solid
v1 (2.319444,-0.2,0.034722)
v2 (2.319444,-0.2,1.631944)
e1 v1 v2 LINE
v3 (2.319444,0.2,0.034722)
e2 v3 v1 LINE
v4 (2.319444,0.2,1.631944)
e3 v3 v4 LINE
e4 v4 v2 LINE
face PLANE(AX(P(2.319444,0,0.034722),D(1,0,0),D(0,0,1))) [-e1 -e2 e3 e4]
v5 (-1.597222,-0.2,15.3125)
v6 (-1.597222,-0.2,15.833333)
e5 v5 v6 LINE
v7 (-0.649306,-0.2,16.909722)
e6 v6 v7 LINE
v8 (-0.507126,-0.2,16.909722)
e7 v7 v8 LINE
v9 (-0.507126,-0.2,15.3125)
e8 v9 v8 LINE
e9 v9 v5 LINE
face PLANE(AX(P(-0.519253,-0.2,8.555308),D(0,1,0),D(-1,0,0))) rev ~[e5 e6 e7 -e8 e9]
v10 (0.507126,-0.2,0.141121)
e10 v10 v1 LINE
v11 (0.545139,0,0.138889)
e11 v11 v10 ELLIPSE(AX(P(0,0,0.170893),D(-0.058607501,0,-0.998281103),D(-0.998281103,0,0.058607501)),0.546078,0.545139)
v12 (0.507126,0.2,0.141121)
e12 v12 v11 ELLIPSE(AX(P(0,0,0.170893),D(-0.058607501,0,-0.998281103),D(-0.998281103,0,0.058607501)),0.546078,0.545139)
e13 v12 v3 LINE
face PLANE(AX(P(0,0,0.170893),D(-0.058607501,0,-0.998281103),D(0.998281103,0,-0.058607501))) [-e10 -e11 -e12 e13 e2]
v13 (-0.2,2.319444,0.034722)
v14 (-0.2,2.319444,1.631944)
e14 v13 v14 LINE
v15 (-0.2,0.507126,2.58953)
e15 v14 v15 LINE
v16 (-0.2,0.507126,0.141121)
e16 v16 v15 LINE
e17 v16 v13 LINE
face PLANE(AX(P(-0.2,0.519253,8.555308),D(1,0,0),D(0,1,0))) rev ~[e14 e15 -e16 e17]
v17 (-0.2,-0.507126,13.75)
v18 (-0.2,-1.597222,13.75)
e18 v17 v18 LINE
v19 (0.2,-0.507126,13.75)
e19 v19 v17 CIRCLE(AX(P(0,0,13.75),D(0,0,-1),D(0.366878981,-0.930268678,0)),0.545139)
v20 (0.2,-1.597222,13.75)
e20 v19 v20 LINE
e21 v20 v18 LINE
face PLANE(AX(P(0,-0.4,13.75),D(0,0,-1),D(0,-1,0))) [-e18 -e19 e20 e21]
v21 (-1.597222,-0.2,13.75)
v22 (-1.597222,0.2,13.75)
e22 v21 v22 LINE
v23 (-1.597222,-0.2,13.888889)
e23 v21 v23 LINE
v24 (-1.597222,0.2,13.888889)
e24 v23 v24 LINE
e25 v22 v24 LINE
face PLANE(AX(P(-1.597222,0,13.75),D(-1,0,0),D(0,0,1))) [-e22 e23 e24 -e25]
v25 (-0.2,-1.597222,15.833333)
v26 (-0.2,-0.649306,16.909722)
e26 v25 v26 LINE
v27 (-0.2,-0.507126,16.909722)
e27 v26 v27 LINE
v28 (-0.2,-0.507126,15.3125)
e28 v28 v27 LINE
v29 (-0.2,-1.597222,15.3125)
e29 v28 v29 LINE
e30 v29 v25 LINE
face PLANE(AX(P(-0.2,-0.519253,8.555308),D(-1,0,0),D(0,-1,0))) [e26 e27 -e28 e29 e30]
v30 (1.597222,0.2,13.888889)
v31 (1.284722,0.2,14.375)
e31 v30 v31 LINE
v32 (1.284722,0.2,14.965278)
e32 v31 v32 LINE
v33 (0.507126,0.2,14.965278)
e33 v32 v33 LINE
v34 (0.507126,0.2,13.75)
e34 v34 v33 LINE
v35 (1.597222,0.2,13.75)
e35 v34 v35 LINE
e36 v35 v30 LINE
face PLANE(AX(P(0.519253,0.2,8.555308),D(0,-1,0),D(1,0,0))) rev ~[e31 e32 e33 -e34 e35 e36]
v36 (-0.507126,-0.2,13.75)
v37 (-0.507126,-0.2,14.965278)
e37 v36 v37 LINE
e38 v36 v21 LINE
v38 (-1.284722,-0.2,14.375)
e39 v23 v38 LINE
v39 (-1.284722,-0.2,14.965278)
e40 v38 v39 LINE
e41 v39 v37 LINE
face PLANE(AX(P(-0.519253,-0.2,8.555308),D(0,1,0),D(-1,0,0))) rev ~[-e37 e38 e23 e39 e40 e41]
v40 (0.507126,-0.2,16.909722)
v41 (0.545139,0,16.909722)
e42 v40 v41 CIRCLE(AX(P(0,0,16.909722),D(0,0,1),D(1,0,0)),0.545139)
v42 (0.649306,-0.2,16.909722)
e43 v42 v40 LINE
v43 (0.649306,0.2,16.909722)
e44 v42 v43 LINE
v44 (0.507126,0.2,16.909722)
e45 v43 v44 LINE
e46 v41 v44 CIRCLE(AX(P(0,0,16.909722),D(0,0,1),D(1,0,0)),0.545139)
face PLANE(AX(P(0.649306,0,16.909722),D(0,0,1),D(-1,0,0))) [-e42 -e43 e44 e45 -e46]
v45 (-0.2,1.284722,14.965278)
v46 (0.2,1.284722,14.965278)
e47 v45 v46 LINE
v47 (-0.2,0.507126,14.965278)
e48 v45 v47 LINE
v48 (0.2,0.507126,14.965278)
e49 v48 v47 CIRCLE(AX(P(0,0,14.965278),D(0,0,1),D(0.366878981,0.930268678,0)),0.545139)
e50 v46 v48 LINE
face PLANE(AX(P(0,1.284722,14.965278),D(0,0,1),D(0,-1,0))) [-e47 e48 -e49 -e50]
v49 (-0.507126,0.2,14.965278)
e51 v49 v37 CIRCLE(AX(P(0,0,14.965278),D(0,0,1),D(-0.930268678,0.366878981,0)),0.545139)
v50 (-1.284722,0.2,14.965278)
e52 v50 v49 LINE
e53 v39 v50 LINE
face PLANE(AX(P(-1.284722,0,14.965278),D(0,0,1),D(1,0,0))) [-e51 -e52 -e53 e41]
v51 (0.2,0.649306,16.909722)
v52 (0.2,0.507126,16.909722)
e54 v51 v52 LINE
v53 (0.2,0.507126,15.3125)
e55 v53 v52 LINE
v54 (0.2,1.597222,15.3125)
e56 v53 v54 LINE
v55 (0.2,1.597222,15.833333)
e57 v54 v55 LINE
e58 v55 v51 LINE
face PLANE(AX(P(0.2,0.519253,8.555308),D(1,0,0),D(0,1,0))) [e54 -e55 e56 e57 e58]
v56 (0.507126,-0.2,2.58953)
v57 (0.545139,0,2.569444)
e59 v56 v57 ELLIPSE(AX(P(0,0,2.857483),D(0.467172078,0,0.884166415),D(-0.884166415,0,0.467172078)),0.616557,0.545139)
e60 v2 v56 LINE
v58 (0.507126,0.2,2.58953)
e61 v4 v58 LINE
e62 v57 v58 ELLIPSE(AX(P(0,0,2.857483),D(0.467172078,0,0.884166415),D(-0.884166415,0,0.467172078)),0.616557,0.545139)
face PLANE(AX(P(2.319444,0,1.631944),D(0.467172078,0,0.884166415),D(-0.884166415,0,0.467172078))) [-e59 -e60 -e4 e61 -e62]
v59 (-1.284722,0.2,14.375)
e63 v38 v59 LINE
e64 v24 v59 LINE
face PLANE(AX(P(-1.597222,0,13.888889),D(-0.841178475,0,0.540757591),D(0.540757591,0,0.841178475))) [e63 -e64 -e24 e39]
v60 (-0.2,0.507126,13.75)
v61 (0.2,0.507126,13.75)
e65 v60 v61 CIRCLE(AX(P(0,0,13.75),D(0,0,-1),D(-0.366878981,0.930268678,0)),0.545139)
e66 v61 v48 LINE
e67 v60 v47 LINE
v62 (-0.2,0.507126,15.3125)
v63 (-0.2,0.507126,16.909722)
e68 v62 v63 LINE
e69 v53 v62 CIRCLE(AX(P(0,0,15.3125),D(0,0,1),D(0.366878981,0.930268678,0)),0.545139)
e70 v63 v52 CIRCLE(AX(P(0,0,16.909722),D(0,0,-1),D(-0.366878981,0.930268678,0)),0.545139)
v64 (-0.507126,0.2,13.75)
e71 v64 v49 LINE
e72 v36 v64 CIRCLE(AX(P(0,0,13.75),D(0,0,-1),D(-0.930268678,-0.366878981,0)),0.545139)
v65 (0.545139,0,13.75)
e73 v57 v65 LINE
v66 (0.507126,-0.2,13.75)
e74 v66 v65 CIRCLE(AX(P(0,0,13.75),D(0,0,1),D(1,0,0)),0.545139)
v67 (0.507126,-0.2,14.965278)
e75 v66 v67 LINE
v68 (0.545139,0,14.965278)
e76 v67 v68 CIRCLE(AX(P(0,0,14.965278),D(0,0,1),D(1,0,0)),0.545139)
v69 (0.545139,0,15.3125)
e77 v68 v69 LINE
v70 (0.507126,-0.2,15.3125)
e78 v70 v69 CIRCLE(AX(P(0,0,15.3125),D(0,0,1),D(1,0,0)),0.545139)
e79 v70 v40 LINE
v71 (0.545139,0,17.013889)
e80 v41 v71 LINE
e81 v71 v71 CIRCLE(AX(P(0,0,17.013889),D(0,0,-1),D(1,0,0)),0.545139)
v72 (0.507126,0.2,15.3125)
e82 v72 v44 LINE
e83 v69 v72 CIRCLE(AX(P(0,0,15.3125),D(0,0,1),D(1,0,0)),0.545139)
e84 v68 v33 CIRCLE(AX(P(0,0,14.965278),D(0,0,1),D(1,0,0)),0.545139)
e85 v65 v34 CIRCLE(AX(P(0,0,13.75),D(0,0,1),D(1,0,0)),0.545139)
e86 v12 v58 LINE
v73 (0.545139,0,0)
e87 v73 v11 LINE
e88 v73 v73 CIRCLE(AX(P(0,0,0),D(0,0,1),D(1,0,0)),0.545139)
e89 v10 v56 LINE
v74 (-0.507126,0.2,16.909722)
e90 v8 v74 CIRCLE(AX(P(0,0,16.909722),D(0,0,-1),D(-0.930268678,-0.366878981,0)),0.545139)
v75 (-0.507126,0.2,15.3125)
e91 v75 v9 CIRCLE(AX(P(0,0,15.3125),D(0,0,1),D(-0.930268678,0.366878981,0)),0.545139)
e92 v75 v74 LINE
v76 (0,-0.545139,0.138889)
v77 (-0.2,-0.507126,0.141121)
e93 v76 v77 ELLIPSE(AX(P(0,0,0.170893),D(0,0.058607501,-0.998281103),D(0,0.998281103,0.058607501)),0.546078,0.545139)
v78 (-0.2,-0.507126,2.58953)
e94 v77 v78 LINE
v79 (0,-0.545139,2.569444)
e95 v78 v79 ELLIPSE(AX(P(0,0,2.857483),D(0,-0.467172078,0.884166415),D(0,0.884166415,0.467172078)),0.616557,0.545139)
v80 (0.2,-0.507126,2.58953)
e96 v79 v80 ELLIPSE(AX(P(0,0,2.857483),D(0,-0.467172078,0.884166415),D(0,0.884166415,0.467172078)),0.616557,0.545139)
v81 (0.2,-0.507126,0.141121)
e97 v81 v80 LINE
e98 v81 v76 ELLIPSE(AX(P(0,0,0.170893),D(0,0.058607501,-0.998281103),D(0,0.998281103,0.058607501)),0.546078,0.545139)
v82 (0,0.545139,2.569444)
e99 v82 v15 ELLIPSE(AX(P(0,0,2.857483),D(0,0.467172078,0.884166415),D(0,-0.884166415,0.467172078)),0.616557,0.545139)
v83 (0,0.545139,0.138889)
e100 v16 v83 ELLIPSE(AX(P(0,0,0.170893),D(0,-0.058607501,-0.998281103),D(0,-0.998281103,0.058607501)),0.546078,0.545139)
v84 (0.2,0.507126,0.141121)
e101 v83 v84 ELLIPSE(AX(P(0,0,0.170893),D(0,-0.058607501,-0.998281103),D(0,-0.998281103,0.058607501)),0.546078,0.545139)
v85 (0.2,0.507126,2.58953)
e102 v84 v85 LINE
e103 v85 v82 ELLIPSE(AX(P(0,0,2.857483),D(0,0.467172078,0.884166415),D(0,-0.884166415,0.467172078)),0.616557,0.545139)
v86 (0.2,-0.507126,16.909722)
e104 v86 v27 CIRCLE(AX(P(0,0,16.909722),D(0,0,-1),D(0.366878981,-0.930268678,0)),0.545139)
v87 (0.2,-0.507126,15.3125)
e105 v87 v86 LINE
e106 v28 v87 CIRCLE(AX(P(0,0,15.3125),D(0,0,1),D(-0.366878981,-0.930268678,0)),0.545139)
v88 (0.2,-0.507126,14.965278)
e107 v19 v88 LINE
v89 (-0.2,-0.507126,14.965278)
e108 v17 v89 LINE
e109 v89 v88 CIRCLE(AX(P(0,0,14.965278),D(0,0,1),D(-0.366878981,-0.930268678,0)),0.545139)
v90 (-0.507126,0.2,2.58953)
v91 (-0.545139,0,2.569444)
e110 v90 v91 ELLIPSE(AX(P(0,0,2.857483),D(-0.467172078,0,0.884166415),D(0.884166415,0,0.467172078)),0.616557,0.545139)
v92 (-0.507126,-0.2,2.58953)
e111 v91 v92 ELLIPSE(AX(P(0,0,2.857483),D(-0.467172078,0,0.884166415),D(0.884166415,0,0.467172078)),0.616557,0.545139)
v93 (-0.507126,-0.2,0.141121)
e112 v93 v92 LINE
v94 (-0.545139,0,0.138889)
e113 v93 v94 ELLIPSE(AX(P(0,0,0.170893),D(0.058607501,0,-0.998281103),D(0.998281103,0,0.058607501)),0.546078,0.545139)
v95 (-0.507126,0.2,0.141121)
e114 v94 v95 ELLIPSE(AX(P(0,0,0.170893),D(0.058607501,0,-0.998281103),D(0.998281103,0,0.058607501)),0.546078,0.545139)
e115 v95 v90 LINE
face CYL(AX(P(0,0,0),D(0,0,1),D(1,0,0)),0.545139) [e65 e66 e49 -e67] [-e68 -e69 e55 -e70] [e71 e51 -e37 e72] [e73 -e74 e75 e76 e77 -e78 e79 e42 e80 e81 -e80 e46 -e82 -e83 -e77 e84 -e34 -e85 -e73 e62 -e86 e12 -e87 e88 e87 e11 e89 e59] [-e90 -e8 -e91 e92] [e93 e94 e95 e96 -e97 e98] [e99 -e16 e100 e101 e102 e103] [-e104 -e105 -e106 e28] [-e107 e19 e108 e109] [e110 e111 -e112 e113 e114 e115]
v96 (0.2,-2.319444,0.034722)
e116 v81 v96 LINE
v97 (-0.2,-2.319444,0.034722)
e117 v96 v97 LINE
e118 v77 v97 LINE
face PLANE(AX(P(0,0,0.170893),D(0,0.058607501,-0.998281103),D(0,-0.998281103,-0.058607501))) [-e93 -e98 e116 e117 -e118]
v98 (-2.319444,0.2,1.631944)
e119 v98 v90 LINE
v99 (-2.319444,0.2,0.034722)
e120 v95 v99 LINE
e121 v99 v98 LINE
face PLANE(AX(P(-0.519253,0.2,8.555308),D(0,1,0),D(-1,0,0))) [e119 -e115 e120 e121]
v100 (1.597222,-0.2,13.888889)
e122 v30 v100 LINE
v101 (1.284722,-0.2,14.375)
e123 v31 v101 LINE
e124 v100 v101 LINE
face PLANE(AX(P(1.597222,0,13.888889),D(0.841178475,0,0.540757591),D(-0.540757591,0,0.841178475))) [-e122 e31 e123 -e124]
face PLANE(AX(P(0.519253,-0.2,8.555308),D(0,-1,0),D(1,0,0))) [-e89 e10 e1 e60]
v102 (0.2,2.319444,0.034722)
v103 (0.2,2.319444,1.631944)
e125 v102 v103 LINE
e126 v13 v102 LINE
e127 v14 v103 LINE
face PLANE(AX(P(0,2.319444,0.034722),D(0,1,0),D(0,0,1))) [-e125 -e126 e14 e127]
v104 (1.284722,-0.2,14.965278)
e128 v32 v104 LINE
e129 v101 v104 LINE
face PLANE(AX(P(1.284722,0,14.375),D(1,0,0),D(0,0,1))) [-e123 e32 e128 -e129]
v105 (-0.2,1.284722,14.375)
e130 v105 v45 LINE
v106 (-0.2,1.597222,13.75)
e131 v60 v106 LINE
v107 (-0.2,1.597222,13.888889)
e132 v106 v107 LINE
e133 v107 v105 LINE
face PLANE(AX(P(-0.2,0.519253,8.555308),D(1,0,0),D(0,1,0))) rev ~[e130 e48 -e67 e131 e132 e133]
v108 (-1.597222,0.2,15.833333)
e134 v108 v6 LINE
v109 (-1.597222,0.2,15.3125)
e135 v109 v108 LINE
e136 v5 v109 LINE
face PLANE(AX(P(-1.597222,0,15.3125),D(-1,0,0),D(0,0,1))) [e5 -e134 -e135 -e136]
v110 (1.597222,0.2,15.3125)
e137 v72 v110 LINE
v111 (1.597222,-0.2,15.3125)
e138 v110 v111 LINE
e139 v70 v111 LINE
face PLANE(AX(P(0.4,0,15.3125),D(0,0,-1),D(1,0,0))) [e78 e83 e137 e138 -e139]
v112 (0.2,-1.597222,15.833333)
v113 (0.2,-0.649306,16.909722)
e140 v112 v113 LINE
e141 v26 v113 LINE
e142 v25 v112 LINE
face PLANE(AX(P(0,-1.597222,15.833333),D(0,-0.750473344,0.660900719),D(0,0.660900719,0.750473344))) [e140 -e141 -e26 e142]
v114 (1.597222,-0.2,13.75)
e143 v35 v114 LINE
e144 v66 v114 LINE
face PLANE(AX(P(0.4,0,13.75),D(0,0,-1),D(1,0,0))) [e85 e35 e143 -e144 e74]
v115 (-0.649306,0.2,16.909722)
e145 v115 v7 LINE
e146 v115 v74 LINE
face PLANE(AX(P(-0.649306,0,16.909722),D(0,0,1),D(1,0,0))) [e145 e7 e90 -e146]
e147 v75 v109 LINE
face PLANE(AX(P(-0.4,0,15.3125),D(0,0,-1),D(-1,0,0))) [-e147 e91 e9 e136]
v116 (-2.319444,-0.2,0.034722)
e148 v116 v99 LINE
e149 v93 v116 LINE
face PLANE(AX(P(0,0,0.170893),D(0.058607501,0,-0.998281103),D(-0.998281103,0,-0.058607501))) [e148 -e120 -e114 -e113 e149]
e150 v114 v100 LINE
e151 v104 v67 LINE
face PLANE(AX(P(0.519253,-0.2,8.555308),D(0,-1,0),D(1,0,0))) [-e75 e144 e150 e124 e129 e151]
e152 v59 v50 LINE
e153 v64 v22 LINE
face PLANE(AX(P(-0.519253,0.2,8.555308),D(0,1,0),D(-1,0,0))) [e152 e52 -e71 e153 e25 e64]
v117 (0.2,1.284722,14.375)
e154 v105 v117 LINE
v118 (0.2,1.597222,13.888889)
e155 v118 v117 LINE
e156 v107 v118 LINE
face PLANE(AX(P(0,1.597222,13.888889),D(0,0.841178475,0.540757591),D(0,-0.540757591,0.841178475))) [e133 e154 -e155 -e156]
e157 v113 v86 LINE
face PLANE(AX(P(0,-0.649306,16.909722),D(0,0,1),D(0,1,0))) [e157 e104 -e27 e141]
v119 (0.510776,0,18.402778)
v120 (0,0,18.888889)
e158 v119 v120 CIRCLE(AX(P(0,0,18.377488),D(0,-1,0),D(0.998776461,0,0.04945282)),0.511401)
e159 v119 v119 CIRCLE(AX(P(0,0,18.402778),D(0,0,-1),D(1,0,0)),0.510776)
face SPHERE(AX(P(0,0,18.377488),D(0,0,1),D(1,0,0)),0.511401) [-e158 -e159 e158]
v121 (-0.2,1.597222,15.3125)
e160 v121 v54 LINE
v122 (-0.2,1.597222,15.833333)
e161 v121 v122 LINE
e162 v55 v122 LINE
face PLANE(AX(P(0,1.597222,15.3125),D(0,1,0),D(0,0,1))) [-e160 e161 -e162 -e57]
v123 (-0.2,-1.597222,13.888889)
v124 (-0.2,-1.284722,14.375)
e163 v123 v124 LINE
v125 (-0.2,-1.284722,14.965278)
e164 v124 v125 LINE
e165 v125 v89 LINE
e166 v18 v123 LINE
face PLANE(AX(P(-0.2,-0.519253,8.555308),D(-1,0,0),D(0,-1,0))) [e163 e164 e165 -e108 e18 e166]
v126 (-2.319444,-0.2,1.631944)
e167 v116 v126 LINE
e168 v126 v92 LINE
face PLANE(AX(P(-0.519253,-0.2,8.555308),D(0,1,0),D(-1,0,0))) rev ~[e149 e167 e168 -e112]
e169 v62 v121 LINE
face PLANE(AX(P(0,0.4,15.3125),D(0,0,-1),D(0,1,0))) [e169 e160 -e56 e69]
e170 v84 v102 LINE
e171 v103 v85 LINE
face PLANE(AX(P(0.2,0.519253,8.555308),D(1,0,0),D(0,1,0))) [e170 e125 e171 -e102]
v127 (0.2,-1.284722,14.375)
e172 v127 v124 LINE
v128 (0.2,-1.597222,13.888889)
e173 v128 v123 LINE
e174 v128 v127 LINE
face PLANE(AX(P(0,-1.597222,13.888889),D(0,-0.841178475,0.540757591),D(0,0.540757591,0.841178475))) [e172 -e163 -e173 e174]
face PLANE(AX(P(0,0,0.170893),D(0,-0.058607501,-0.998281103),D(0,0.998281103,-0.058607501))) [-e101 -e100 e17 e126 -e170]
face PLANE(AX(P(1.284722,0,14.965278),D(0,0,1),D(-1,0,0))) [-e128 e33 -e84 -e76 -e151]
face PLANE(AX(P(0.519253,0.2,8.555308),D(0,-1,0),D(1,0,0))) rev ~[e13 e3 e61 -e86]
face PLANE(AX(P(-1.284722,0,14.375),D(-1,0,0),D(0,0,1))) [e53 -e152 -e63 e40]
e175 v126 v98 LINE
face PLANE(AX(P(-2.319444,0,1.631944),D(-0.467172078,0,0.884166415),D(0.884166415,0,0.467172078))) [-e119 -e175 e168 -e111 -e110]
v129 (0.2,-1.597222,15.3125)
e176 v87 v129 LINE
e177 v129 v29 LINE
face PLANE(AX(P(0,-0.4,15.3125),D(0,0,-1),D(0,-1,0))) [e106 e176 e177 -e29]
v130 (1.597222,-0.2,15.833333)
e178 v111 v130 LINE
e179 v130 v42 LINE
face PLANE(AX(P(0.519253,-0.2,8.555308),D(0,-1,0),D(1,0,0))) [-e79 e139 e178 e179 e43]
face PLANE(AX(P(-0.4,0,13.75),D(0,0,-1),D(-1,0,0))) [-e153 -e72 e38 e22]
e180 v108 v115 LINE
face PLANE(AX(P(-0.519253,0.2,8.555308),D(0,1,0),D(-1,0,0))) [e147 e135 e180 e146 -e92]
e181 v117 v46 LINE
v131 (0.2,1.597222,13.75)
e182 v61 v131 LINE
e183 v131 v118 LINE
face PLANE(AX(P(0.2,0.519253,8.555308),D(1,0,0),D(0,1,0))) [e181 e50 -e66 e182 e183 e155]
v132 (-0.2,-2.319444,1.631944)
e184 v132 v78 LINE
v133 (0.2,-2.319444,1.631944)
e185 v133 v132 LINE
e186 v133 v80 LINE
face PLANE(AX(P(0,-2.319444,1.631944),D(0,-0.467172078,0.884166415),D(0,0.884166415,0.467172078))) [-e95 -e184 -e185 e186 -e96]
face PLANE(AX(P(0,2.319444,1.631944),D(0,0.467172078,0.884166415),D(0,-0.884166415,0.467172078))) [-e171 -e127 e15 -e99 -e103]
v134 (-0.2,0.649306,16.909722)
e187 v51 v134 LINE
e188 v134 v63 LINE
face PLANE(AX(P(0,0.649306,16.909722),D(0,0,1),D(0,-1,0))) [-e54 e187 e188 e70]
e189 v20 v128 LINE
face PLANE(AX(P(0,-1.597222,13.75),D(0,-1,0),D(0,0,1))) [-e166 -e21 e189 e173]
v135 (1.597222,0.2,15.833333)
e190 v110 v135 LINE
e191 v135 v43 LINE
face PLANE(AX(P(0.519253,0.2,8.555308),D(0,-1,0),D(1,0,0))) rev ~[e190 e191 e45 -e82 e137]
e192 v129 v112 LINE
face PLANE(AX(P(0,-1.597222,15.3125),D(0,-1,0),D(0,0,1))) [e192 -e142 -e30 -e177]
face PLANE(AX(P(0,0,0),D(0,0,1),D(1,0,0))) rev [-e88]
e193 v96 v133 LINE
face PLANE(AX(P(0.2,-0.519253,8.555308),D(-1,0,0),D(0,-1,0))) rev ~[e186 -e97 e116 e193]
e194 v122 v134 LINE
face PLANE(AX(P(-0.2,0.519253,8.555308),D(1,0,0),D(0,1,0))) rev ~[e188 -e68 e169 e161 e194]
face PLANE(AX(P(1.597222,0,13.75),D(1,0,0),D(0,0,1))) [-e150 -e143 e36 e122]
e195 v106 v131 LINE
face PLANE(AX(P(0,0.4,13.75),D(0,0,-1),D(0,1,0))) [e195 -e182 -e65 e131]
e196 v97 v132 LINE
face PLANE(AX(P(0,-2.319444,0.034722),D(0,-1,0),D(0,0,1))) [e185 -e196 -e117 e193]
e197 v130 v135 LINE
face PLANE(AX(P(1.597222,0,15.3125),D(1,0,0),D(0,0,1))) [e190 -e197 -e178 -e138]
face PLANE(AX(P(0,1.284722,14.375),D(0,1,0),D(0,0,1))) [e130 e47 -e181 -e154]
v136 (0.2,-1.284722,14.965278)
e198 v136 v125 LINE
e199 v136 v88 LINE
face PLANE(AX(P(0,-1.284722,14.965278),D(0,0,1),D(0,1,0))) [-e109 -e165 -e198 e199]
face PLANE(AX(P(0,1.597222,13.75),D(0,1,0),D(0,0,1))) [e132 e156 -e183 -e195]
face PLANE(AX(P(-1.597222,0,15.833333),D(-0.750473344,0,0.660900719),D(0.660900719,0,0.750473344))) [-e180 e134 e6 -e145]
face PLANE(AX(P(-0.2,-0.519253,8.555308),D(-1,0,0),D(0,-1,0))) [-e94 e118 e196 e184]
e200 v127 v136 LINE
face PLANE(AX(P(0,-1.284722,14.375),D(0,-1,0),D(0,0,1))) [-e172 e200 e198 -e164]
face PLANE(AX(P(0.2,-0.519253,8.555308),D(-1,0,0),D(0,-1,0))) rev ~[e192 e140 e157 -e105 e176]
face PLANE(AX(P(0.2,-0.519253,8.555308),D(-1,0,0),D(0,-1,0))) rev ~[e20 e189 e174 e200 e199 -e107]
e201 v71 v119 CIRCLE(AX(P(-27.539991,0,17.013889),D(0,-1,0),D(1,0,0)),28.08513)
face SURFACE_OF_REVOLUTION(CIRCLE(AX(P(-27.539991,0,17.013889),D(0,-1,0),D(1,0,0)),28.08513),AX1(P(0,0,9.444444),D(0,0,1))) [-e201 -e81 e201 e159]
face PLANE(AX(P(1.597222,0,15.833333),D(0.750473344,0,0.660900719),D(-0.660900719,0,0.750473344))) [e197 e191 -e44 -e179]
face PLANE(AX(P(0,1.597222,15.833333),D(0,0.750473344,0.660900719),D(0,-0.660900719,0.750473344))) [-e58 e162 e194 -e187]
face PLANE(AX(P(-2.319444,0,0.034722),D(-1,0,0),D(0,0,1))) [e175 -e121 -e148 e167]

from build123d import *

# Parameters (mm, degrees)
F3_DEPTH = 0.2
F4_COUNT = 4


# Not quite as in the source:
# - a feature names something its author has since deleted; it is built from what else it names


with BuildPart() as f1:
    # F0 (on Front) → F1 (revolve)
    with BuildSketch(Plane.XZ):
        with BuildLine():
            Line((0, 18.8888888889), (0, 0))
            Line((0, 0), (0.5451388889, 0))
            Line((0.5451388889, 0), (0.5451388889, 17.0138888889))
            ThreePointArc((0.5451388889, 17.0138888889), (0.53654676, 17.7085458509), (0.5107756304, 18.4027777778))
            ThreePointArc((0.5107756304, 18.4027777778), (0.3525605469, 18.7479364578), (0, 18.8888888889))
        make_face()
    revolve(axis=Axis((0, 0, 9.4444444444), (0, 0, 1)))

    # F2 (on Front) → F3 (join, symmetric)
    with BuildSketch(Plane.XZ):
        Polygon((0, 16.9097222222), (0, 0.1708931289), (2.3194444444, 0.0347222222), (2.3194444444, 1.6319444444), (0.4, 2.6461323114), (0.4, 13.75), (1.5972222222, 13.75), (1.5972222222, 13.8888888889), (1.2847222222, 14.375), (1.2847222222, 14.9652777778), (0.4, 14.9652777778), (0.4, 15.3125), (1.5972222222, 15.3125), (1.5972222222, 15.8333333333), (0.6493055556, 16.9097222222), align=None)
    extrude(amount=F3_DEPTH, both=True)

    # F4: F1 ×4 about axis
    f4_axis = Axis((0, 0, 0), (0, 0, 1))


with BuildPart() as f1_1:
    add(f1.part)
    for i in range(1, F4_COUNT):
        add(f1.part.rotate(f4_axis, i * 360 / F4_COUNT))


solid = f1_1.part
